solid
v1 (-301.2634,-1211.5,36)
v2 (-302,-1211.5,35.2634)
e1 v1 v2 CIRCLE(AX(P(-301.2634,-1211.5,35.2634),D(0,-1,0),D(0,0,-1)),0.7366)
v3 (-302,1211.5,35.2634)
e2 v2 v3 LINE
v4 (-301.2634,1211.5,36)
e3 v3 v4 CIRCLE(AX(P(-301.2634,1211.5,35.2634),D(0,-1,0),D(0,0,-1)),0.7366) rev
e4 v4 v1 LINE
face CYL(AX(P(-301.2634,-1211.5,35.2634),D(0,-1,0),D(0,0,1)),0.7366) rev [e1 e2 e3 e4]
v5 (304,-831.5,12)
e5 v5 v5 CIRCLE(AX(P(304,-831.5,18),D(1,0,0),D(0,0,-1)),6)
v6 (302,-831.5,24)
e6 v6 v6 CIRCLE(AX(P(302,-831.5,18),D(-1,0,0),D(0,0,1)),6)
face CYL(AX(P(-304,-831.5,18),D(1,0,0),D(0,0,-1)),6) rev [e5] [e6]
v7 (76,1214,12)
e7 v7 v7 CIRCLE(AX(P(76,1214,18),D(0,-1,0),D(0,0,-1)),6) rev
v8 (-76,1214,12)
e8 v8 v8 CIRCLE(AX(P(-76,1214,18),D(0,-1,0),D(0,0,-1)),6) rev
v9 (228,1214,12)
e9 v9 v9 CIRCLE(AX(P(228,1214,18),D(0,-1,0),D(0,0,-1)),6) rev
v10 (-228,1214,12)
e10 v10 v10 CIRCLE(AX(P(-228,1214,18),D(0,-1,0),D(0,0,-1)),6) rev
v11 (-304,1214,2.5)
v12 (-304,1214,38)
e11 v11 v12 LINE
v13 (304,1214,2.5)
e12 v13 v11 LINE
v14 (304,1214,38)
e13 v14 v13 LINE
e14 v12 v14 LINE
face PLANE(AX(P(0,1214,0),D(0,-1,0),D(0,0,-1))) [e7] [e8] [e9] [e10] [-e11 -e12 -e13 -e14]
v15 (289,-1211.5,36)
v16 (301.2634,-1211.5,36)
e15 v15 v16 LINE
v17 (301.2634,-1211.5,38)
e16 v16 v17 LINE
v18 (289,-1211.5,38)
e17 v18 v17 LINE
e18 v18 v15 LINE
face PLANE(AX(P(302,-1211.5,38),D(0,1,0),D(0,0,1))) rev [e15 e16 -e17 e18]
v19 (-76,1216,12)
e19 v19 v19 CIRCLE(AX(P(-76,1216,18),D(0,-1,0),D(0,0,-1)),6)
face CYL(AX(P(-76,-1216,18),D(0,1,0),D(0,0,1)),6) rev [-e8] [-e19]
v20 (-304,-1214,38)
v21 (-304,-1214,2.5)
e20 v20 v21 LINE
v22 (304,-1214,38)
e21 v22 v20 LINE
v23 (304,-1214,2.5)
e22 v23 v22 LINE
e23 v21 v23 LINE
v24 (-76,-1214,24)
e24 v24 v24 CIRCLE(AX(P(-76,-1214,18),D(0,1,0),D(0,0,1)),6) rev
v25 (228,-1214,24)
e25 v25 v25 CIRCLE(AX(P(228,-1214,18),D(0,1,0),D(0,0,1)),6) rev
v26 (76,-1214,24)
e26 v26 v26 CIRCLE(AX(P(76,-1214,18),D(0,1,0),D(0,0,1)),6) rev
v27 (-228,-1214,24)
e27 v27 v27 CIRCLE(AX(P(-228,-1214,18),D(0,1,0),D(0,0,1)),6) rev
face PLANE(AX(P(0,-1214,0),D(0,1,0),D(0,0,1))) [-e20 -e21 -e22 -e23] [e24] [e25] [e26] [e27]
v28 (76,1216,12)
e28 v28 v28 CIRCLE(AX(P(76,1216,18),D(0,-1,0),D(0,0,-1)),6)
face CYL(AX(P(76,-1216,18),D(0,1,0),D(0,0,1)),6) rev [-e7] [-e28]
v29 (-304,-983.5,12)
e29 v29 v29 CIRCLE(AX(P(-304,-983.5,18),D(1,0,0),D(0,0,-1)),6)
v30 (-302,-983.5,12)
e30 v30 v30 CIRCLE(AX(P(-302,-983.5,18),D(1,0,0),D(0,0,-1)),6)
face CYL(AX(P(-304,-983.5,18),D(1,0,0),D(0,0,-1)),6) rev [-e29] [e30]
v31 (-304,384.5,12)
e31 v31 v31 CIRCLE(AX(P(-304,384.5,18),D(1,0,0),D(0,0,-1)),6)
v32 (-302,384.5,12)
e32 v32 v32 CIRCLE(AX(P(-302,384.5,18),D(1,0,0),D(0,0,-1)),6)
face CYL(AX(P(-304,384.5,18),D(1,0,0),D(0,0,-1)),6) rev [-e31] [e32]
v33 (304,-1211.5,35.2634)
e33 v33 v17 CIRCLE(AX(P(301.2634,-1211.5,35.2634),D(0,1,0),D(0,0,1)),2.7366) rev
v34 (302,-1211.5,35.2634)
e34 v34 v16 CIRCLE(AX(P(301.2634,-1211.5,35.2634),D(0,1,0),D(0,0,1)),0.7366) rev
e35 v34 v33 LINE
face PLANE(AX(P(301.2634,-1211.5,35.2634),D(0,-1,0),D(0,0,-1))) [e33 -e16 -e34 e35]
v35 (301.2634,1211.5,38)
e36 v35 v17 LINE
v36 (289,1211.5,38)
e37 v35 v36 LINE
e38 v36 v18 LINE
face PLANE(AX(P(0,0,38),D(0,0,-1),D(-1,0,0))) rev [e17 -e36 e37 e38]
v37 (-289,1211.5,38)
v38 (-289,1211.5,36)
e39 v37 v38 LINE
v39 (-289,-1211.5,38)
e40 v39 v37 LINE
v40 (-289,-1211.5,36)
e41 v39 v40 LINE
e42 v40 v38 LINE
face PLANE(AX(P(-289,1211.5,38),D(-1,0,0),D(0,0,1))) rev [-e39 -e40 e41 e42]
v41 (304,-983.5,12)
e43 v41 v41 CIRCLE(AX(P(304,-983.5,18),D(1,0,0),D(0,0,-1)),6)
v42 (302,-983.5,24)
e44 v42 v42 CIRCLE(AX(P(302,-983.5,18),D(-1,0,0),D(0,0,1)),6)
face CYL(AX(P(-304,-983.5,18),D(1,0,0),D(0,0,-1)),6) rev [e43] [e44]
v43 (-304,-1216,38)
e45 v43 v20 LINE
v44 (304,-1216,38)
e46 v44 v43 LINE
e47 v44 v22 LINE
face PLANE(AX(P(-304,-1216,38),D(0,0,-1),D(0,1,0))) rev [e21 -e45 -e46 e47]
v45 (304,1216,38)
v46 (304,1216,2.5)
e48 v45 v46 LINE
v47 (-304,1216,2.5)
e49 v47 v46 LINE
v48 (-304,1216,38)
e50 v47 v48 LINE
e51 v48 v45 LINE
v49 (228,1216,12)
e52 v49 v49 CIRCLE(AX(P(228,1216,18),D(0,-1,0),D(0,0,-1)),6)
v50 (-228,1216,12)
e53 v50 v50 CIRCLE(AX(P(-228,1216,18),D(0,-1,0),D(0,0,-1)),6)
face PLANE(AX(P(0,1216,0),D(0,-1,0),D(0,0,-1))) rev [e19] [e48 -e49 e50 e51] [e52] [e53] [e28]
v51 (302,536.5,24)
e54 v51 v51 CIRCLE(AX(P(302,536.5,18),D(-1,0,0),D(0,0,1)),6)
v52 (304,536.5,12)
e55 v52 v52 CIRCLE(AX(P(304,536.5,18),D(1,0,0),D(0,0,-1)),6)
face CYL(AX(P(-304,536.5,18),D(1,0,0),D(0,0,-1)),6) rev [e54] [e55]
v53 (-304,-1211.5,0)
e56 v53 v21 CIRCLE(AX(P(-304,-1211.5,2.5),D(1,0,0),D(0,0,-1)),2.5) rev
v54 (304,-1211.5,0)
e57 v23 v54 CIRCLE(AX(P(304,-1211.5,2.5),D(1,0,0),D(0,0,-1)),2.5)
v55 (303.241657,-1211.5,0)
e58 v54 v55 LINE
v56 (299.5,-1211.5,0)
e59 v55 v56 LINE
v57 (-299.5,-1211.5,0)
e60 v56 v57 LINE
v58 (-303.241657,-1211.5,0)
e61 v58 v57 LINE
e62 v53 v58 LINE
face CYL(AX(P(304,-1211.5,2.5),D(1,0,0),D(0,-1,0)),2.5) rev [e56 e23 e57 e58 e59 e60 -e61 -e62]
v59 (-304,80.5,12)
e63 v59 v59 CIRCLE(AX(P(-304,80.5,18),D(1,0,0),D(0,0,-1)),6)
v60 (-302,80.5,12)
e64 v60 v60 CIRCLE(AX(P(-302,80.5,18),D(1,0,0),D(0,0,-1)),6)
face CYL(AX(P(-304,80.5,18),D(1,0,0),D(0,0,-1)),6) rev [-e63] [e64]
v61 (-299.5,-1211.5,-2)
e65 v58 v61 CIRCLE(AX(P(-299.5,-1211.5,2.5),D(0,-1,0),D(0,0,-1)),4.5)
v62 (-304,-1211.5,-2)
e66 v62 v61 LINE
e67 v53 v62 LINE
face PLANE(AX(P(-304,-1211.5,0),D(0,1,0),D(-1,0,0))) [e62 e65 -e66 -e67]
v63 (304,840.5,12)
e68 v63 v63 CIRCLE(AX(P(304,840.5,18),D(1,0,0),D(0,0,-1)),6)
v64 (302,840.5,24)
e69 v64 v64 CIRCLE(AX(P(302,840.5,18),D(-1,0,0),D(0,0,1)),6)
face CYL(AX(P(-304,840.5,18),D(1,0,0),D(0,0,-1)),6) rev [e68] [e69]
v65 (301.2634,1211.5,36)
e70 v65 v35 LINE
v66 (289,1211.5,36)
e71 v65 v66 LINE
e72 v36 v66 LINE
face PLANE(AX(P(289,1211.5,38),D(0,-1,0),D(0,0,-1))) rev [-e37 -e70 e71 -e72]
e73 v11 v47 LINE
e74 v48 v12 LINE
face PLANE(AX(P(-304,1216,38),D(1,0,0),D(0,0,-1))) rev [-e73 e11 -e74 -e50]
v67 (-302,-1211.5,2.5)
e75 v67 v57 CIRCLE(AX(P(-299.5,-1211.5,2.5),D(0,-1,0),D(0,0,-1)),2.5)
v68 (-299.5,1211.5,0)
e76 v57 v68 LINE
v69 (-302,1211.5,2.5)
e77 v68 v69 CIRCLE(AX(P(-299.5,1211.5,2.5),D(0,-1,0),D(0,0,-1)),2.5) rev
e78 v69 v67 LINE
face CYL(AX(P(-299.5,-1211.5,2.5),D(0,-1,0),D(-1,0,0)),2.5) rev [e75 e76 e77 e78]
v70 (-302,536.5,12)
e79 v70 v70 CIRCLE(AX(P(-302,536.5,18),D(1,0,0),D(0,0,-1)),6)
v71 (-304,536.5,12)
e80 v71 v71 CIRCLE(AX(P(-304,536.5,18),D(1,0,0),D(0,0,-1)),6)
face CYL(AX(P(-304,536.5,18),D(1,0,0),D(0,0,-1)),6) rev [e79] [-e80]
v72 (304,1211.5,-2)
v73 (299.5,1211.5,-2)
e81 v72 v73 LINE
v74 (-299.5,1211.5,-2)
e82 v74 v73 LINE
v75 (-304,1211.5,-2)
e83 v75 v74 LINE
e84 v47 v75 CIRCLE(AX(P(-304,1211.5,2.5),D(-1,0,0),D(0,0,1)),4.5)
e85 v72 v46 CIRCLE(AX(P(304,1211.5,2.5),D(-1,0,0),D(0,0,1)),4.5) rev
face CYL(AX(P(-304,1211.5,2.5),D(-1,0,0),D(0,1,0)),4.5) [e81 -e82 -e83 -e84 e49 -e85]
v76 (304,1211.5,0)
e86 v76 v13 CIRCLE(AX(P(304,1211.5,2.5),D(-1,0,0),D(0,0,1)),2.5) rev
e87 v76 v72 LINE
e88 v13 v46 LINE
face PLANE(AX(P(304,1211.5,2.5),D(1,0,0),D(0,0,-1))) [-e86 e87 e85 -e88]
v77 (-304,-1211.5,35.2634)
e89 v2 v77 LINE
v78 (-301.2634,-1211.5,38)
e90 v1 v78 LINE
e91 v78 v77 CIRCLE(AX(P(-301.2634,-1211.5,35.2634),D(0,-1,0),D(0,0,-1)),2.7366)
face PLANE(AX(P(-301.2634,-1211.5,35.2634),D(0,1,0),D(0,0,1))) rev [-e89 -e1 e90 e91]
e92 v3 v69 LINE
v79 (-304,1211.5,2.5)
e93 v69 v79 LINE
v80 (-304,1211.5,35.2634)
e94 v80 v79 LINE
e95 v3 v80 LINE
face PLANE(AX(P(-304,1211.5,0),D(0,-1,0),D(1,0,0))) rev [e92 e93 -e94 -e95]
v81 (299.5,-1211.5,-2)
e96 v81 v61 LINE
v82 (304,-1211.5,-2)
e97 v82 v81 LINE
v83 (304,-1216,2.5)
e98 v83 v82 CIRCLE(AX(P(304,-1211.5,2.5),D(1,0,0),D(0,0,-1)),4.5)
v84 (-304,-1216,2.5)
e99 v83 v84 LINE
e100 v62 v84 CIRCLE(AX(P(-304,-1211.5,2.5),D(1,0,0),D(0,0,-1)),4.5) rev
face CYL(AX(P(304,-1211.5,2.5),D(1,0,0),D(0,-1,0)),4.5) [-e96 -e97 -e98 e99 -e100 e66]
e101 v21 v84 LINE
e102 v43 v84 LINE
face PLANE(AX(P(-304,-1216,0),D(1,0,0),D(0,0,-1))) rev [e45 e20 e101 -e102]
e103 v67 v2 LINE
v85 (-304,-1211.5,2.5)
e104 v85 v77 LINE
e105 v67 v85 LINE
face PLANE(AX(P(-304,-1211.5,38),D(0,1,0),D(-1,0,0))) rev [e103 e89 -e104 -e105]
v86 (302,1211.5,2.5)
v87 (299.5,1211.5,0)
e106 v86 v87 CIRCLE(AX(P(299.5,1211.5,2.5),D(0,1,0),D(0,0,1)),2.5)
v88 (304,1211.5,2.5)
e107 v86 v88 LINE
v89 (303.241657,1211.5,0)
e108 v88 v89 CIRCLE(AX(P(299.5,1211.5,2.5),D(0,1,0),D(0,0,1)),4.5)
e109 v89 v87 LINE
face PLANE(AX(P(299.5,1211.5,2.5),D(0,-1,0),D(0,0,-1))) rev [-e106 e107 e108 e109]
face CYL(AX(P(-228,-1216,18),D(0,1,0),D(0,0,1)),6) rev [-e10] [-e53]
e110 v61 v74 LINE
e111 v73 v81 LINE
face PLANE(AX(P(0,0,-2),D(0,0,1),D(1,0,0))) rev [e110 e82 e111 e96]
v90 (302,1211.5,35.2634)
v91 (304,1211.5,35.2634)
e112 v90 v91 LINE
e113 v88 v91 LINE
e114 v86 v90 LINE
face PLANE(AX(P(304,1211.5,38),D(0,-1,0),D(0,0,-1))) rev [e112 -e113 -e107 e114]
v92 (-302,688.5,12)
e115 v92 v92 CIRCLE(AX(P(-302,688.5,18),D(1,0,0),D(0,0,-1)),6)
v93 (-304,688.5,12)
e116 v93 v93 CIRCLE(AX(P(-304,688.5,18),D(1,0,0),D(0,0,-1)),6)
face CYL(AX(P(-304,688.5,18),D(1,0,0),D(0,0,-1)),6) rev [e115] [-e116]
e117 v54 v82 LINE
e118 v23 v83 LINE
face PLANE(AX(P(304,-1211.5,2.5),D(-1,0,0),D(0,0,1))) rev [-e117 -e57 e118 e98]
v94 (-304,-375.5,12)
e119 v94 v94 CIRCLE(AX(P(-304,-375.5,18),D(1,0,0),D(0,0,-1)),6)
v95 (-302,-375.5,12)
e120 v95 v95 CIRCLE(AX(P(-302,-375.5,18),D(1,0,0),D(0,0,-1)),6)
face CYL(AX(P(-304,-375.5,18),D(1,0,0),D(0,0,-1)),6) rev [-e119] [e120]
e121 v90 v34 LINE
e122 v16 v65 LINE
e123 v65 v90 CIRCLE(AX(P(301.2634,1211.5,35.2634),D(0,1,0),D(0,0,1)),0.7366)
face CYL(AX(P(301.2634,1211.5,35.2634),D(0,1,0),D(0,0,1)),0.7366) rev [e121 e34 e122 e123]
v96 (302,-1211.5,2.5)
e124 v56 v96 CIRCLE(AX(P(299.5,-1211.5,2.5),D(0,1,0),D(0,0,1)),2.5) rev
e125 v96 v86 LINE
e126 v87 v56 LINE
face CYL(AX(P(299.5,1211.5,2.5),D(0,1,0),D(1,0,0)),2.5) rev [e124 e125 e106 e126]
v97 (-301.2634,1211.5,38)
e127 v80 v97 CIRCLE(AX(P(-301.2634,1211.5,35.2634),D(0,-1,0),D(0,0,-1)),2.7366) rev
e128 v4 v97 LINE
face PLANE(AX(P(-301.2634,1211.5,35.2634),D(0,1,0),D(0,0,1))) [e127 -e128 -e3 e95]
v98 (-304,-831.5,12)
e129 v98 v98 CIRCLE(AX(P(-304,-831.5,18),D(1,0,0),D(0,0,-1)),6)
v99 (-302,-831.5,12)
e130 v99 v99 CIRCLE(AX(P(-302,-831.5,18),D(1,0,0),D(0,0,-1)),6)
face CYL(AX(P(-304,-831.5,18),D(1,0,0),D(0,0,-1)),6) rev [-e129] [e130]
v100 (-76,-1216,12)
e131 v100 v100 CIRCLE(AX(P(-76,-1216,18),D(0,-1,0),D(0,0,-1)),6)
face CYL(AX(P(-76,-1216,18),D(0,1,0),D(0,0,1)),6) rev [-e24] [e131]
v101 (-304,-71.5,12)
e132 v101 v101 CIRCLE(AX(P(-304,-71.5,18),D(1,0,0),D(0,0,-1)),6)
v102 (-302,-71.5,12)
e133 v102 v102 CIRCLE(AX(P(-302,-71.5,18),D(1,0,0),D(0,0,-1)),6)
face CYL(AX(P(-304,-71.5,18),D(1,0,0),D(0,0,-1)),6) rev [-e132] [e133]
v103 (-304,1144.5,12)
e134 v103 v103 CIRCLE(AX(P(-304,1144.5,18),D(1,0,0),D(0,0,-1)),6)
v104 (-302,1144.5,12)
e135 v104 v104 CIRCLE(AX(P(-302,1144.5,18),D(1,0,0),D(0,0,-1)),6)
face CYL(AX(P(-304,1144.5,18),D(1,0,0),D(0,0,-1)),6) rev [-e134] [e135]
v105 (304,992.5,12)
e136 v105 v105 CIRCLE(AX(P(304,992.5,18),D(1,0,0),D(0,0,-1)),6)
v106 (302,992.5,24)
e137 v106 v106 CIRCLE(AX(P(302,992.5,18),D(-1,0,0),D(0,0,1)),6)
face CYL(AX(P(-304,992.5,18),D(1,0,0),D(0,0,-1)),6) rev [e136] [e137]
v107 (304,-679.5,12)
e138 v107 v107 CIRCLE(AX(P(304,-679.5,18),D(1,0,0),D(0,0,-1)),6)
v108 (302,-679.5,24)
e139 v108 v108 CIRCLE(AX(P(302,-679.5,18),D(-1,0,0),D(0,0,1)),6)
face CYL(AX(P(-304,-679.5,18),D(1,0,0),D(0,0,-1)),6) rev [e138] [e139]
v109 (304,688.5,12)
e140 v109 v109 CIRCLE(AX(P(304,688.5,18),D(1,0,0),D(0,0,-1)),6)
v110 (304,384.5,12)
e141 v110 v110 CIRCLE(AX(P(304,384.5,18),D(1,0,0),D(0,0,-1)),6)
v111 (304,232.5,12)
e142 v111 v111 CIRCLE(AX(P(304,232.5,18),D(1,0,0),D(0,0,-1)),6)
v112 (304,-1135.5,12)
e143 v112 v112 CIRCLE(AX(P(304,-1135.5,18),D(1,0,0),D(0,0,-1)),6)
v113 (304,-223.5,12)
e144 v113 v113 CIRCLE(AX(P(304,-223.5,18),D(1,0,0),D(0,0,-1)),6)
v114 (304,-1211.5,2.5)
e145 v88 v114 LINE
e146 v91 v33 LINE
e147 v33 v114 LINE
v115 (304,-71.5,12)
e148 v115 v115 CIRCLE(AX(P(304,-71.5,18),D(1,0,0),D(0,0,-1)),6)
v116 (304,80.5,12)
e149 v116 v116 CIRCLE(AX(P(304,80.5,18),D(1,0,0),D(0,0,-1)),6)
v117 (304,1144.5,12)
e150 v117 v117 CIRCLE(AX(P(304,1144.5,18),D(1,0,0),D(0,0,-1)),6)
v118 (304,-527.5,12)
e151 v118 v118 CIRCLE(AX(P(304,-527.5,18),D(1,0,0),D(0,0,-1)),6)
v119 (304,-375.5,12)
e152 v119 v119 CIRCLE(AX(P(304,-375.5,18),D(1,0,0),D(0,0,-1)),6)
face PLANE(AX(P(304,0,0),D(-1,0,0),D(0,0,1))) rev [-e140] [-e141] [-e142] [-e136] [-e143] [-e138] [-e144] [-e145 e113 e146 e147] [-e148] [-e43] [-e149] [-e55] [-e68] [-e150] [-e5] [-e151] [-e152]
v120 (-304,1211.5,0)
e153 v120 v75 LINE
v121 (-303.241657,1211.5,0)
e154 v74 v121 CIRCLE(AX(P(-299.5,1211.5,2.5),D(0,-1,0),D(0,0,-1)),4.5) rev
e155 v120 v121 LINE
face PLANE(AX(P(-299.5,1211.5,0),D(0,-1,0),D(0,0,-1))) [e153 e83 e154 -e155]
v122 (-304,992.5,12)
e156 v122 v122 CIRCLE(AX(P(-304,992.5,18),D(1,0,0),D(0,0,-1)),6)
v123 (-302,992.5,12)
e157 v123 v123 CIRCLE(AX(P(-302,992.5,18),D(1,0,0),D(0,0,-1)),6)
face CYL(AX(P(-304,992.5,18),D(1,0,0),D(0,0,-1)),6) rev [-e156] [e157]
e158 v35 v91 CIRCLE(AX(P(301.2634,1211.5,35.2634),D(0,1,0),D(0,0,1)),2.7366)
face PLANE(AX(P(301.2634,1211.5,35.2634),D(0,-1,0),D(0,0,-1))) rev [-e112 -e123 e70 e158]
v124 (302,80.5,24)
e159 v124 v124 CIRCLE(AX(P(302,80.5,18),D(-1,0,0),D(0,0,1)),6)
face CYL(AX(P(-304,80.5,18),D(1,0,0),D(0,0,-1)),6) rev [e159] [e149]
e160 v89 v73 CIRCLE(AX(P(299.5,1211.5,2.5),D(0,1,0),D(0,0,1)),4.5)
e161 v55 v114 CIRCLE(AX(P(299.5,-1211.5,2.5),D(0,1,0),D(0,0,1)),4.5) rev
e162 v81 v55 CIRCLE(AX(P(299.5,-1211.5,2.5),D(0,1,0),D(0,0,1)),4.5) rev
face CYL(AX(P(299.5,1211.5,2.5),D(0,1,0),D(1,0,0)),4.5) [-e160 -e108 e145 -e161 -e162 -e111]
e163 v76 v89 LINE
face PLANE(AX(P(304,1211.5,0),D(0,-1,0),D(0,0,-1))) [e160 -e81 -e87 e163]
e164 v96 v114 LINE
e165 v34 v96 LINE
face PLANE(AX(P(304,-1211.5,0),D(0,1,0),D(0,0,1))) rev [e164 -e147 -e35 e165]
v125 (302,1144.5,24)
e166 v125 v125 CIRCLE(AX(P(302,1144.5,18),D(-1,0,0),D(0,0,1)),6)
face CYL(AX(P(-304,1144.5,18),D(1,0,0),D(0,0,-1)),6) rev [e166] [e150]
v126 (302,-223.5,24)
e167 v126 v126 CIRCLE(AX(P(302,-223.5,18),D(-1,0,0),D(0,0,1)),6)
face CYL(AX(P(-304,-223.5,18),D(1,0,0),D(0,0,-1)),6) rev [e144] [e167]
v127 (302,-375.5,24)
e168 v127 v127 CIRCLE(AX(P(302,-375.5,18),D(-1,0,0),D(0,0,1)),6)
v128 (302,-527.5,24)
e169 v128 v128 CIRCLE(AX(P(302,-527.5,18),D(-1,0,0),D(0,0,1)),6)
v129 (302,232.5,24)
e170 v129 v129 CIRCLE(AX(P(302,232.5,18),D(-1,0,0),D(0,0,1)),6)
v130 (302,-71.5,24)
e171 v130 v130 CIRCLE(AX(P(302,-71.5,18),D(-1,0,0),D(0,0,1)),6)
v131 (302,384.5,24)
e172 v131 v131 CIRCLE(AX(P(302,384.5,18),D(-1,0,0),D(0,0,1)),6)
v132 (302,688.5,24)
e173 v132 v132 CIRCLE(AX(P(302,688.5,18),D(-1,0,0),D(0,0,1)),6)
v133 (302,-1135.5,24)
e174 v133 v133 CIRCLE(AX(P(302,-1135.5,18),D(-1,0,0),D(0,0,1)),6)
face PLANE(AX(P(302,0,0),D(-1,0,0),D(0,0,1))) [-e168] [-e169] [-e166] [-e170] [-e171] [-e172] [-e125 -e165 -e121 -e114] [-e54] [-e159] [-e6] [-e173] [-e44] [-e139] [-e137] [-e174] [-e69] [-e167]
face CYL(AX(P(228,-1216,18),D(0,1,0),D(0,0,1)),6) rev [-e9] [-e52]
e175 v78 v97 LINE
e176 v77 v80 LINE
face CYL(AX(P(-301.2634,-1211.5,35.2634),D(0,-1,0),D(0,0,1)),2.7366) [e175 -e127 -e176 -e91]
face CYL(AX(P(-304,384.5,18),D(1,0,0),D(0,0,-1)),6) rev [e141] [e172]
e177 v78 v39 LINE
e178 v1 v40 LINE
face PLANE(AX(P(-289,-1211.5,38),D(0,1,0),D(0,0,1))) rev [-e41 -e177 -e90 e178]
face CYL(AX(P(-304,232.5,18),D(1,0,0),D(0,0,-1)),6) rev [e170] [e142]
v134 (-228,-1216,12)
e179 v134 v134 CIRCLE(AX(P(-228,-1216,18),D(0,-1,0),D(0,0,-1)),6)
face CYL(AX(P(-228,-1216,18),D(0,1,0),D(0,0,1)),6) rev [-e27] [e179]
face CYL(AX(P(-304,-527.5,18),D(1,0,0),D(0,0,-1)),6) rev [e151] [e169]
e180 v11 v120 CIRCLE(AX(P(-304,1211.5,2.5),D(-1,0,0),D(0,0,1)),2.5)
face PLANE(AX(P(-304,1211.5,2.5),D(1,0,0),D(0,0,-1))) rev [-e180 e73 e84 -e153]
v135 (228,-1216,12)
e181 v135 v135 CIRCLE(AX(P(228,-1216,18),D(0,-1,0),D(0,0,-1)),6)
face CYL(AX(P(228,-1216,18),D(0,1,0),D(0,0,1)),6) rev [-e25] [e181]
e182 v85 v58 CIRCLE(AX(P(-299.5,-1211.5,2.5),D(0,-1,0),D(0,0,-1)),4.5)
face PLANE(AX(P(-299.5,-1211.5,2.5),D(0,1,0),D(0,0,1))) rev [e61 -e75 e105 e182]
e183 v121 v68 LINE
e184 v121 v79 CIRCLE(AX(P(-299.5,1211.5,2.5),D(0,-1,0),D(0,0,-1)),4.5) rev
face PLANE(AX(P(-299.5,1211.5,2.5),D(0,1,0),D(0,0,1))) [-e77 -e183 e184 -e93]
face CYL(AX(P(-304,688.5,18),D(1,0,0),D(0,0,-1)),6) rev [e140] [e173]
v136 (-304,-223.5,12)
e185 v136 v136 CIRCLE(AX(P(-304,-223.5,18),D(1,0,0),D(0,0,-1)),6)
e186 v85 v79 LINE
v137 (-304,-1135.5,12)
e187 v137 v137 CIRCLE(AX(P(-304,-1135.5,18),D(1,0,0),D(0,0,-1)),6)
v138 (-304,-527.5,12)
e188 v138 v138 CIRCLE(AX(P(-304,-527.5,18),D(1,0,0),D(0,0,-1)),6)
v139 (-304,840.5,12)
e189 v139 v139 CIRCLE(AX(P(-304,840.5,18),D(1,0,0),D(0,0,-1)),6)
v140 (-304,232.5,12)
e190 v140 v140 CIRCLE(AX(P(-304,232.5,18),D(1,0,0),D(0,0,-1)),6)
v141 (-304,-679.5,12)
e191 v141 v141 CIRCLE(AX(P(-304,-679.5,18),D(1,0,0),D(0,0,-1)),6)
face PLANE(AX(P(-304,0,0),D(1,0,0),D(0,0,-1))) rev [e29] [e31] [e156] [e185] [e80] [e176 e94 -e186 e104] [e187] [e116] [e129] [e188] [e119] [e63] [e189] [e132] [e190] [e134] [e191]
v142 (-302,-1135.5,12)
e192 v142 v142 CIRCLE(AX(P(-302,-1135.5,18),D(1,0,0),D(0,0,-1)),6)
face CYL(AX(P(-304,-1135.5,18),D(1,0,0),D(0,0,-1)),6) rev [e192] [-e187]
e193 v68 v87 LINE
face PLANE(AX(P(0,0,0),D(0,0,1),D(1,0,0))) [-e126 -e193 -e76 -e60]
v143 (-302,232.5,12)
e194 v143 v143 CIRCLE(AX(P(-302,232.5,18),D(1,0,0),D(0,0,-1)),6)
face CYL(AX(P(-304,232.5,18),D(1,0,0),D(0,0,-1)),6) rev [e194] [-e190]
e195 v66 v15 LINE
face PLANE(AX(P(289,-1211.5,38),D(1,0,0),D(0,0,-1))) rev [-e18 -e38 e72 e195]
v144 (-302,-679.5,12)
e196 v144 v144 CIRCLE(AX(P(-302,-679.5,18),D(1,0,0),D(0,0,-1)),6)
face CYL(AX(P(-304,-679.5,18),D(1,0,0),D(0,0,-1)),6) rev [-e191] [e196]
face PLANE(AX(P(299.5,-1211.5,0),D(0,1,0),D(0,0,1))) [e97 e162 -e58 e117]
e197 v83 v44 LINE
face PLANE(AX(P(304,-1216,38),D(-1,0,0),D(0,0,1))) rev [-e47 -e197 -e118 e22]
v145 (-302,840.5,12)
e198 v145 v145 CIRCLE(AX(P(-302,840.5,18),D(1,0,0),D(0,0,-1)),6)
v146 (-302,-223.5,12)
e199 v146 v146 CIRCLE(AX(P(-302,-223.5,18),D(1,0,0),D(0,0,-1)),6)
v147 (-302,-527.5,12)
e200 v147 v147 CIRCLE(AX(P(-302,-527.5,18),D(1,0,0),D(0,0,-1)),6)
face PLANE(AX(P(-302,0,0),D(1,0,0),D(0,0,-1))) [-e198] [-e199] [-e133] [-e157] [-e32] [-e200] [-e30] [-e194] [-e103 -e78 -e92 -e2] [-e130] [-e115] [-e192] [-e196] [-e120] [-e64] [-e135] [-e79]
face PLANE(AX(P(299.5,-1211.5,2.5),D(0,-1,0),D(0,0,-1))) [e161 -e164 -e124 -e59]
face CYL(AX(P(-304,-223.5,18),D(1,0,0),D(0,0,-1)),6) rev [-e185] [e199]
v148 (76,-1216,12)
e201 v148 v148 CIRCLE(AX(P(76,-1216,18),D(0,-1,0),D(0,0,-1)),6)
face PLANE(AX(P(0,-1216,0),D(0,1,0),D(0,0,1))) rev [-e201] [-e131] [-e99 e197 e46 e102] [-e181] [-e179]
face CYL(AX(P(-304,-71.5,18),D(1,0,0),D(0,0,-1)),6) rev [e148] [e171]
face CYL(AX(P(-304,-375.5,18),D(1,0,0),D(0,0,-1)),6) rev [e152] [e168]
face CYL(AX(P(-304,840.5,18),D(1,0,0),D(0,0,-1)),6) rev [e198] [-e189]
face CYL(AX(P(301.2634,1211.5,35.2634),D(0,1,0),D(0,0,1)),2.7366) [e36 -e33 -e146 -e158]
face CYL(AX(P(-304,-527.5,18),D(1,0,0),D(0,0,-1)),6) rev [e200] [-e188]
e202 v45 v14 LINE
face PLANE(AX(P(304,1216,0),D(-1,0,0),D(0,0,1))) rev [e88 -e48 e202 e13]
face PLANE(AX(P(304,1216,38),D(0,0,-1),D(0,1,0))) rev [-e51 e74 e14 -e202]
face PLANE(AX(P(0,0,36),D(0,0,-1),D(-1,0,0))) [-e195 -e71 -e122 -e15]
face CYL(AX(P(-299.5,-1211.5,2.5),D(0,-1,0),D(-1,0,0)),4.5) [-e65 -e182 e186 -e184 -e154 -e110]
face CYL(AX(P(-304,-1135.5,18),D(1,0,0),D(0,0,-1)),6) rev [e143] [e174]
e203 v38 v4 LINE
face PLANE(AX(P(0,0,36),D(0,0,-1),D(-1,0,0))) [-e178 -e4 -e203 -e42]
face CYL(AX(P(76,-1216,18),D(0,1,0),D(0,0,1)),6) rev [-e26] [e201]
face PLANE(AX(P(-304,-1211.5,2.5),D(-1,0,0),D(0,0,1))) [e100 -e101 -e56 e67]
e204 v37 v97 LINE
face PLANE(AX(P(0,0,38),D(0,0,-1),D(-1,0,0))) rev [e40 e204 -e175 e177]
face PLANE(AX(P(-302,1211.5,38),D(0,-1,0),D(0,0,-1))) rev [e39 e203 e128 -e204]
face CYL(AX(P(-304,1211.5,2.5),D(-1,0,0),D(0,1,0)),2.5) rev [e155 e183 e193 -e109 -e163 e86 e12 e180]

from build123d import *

# Parameters (mm, degrees)
SKETCH1_W                      = 608
SKETCH1_H                      = 2432
BASE_FLANGE1_DEPTH             = 2
EDGE_FLANGE5_STRIP_W           = 13
EDGE_FLANGE5_STRIP_H           = 2
EDGE_FLANGE5_STRIP_CUT_DEPTH   = 608
EDGE_FLANGE5_STRIP_2_W         = 13
EDGE_FLANGE5_STRIP_2_H         = 2
EDGE_FLANGE5_STRIP_CUT_2_DEPTH = 608
EDGE_FLANGE5_DEPTH             = 608
EDGE_FLANGE5_BEND_DEPTH        = 608
EDGE_FLANGE1_STRIP_W           = 13
EDGE_FLANGE1_STRIP_H           = 2
EDGE_FLANGE1_STRIP_CUT_DEPTH   = 2423
EDGE_FLANGE1_STRIP_2_W         = 13
EDGE_FLANGE1_STRIP_2_H         = 2
EDGE_FLANGE1_STRIP_CUT_2_DEPTH = 2423
EDGE_FLANGE1_DEPTH             = 2423
EDGE_FLANGE1_BEND_DEPTH        = 2423
EDGE_FLANGE3_STRIP_W           = 9.4732
EDGE_FLANGE3_STRIP_H           = 2
EDGE_FLANGE3_STRIP_CUT_DEPTH   = 2423
EDGE_FLANGE3_STRIP_2_W         = 9.4732
EDGE_FLANGE3_STRIP_2_H         = 2
EDGE_FLANGE3_STRIP_CUT_2_DEPTH = 2423
EDGE_FLANGE3_DEPTH             = 2423
EDGE_FLANGE3_BEND_DEPTH        = 2423
SKETCH35_R                     = 6
CUT_EXTRUDE1_DEPTH             = 1361.060292781
LPATTERN1_COUNT                = 16
LPATTERN1_PITCH                = 152
SKETCH37_R                     = 6
CUT_EXTRUDE3_DEPTH             = 2754.099344375
LPATTERN3_COUNT                = 4
LPATTERN3_PITCH                = 152


# Sheet-metal steps are written as plain solids
with BuildPart() as part:
    # Sketch1 → Base-Flange1 (new body)
    with BuildSketch(Plane.XY):
        Rectangle(SKETCH1_W, SKETCH1_H)
    extrude(amount=-BASE_FLANGE1_DEPTH)

    # Edge-Flange5 strip (across the edge) → Edge-Flange5 strip cut (cut)
    with BuildSketch(Plane(origin=(304, 1216, 0), x_dir=(0, -1, 0), z_dir=(-1, 0, 0))):
        with Locations((-2, -1)):
            Rectangle(EDGE_FLANGE5_STRIP_W, EDGE_FLANGE5_STRIP_H)
    extrude(amount=EDGE_FLANGE5_STRIP_CUT_DEPTH, mode=Mode.SUBTRACT)

    # Edge-Flange5 strip 2 (across the edge) → Edge-Flange5 strip cut 2 (cut)
    with BuildSketch(Plane(origin=(-304, -1216, 0), x_dir=(0, 1, 0), z_dir=(1, 0, 0))):
        with Locations((-2, -1)):
            Rectangle(EDGE_FLANGE5_STRIP_2_W, EDGE_FLANGE5_STRIP_2_H)
    extrude(amount=EDGE_FLANGE5_STRIP_CUT_2_DEPTH, mode=Mode.SUBTRACT)

    # Edge-Flange5 section (across the edge) → Edge-Flange5 (add)
    with BuildSketch(Plane(origin=(304, 1216, 0), x_dir=(0, -1, 0), z_dir=(-1, 0, 0))):
        with BuildLine():
            Line((0, 2.5), (0, 38))
            Line((0, 38), (2, 38))
            Line((2, 38), (2, 2.5))
            ThreePointArc((2, 2.5), (2.732233047, 0.732233047), (4.5, 0))
            Line((4.5, 0), (4.5, -2))
            ThreePointArc((4.5, -2), (1.318019485, -0.681980515), (0, 2.5))
        make_face()
    extrude(amount=EDGE_FLANGE5_DEPTH)

    # Edge-Flange5 section 2 (across the edge) → Edge-Flange5 bend (add)
    with BuildSketch(Plane(origin=(-304, -1216, 0), x_dir=(0, 1, 0), z_dir=(1, 0, 0))):
        with BuildLine():
            Line((0, 2.5), (0, 38))
            Line((0, 38), (2, 38))
            Line((2, 38), (2, 2.5))
            ThreePointArc((2, 2.5), (2.732233047, 0.732233047), (4.5, 0))
            Line((4.5, 0), (4.5, -2))
            ThreePointArc((4.5, -2), (1.318019485, -0.681980515), (0, 2.5))
        make_face()
    extrude(amount=EDGE_FLANGE5_BEND_DEPTH)

    # Edge-Flange1 strip (across the edge) → Edge-Flange1 strip cut (cut)
    with BuildSketch(Plane(origin=(304, -1211.5, 0), x_dir=(-1, 0, 0), z_dir=(0, 1, 0))):
        with Locations((-2, -1)):
            Rectangle(EDGE_FLANGE1_STRIP_W, EDGE_FLANGE1_STRIP_H)
    extrude(amount=EDGE_FLANGE1_STRIP_CUT_DEPTH, mode=Mode.SUBTRACT)

    # Edge-Flange1 strip 2 (across the edge) → Edge-Flange1 strip cut 2 (cut)
    with BuildSketch(Plane(origin=(-304, 1211.5, 0), x_dir=(1, 0, 0), z_dir=(0, -1, 0))):
        with Locations((-2, -1)):
            Rectangle(EDGE_FLANGE1_STRIP_2_W, EDGE_FLANGE1_STRIP_2_H)
    extrude(amount=EDGE_FLANGE1_STRIP_CUT_2_DEPTH, mode=Mode.SUBTRACT)

    # Edge-Flange1 section (across the edge) → Edge-Flange1 (add)
    with BuildSketch(Plane(origin=(304, -1211.5, 0), x_dir=(-1, 0, 0), z_dir=(0, 1, 0))):
        with BuildLine():
            Line((0, 2.5), (0, 38))
            Line((0, 38), (2, 38))
            Line((2, 38), (2, 2.5))
            ThreePointArc((2, 2.5), (2.732233047, 0.732233047), (4.5, 0))
            Line((4.5, 0), (4.5, -2))
            ThreePointArc((4.5, -2), (1.318019485, -0.681980515), (0, 2.5))
        make_face()
    extrude(amount=EDGE_FLANGE1_DEPTH)

    # Edge-Flange1 section 2 (across the edge) → Edge-Flange1 bend (add)
    with BuildSketch(Plane(origin=(-304, 1211.5, 0), x_dir=(1, 0, 0), z_dir=(0, -1, 0))):
        with BuildLine():
            Line((0, 2.5), (0, 38))
            Line((0, 38), (2, 38))
            Line((2, 38), (2, 2.5))
            ThreePointArc((2, 2.5), (2.732233047, 0.732233047), (4.5, 0))
            Line((4.5, 0), (4.5, -2))
            ThreePointArc((4.5, -2), (1.318019485, -0.681980515), (0, 2.5))
        make_face()
    extrude(amount=EDGE_FLANGE1_BEND_DEPTH)

    # Edge-Flange3 strip (across the edge) → Edge-Flange3 strip cut (cut)
    with BuildSketch(Plane(origin=(302, -1211.5, 38), x_dir=(0, 0, -1), z_dir=(0, 1, 0))):
        with Locations((-2, -1)):
            Rectangle(EDGE_FLANGE3_STRIP_W, EDGE_FLANGE3_STRIP_H)
    extrude(amount=EDGE_FLANGE3_STRIP_CUT_DEPTH, mode=Mode.SUBTRACT)

    # Edge-Flange3 strip 2 (across the edge) → Edge-Flange3 strip cut 2 (cut)
    with BuildSketch(Plane(origin=(-302, 1211.5, 38), x_dir=(0, 0, -1), z_dir=(0, -1, 0))):
        with Locations((-2, -1)):
            Rectangle(EDGE_FLANGE3_STRIP_2_W, EDGE_FLANGE3_STRIP_2_H)
    extrude(amount=EDGE_FLANGE3_STRIP_CUT_2_DEPTH, mode=Mode.SUBTRACT)

    # Edge-Flange3 section (across the edge) → Edge-Flange3 (add)
    with BuildSketch(Plane(origin=(302, -1211.5, 38), x_dir=(0, 0, -1), z_dir=(0, 1, 0))):
        with BuildLine():
            Line((0, 0.7366), (0, 13))
            Line((0, 13), (2, 13))
            Line((2, 13), (2, 0.7366))
            ThreePointArc((2, 0.7366), (2.215745145, 0.215745145), (2.7366, 0))
            Line((2.7366, 0), (2.7366, -2))
            ThreePointArc((2.7366, -2), (0.801531583, -1.198468417), (0, 0.7366))
        make_face()
    extrude(amount=EDGE_FLANGE3_DEPTH)

    # Edge-Flange3 section 2 (across the edge) → Edge-Flange3 bend (add)
    with BuildSketch(Plane(origin=(-302, 1211.5, 38), x_dir=(0, 0, -1), z_dir=(0, -1, 0))):
        with BuildLine():
            Line((0, 0.7366), (0, 13))
            Line((0, 13), (2, 13))
            Line((2, 13), (2, 0.7366))
            ThreePointArc((2, 0.7366), (2.215745145, 0.215745145), (2.7366, 0))
            Line((2.7366, 0), (2.7366, -2))
            ThreePointArc((2.7366, -2), (0.801531583, -1.198468417), (0, 0.7366))
        make_face()
    extrude(amount=EDGE_FLANGE3_BEND_DEPTH)

    # Sketch35 → Cut-Extrude1 (cut, through all)
    with BuildSketch(Plane(origin=(304, 0, 0), x_dir=(0, 0, -1), z_dir=(1, 0, 0))):
        with Locations((-18, -1135.5)):
            Circle(SKETCH35_R)
    cut_extrude1 = extrude(amount=-CUT_EXTRUDE1_DEPTH, mode=Mode.SUBTRACT)

    # LPattern1: Cut-Extrude1 ×16
    with Locations(*[(0, i * LPATTERN1_PITCH, 0) for i in range(1, LPATTERN1_COUNT)]):
        add(cut_extrude1, mode=Mode.SUBTRACT)

    # Sketch37 → Cut-Extrude3 (cut, through all)
    with BuildSketch(Plane(origin=(0, 1216, -1216), x_dir=(1, 0, 0), z_dir=(0, -1, 0))):
        with Locations(Location((228, 1234, 0), (0, 0, 90))):
            Circle(SKETCH37_R)
    cut_extrude3 = extrude(amount=CUT_EXTRUDE3_DEPTH, mode=Mode.SUBTRACT)

    # LPattern3: Cut-Extrude3 ×4
    with Locations(*[(-i * LPATTERN3_PITCH, 0, 0) for i in range(1, LPATTERN3_COUNT)]):
        add(cut_extrude3, mode=Mode.SUBTRACT)


solid = part.part
